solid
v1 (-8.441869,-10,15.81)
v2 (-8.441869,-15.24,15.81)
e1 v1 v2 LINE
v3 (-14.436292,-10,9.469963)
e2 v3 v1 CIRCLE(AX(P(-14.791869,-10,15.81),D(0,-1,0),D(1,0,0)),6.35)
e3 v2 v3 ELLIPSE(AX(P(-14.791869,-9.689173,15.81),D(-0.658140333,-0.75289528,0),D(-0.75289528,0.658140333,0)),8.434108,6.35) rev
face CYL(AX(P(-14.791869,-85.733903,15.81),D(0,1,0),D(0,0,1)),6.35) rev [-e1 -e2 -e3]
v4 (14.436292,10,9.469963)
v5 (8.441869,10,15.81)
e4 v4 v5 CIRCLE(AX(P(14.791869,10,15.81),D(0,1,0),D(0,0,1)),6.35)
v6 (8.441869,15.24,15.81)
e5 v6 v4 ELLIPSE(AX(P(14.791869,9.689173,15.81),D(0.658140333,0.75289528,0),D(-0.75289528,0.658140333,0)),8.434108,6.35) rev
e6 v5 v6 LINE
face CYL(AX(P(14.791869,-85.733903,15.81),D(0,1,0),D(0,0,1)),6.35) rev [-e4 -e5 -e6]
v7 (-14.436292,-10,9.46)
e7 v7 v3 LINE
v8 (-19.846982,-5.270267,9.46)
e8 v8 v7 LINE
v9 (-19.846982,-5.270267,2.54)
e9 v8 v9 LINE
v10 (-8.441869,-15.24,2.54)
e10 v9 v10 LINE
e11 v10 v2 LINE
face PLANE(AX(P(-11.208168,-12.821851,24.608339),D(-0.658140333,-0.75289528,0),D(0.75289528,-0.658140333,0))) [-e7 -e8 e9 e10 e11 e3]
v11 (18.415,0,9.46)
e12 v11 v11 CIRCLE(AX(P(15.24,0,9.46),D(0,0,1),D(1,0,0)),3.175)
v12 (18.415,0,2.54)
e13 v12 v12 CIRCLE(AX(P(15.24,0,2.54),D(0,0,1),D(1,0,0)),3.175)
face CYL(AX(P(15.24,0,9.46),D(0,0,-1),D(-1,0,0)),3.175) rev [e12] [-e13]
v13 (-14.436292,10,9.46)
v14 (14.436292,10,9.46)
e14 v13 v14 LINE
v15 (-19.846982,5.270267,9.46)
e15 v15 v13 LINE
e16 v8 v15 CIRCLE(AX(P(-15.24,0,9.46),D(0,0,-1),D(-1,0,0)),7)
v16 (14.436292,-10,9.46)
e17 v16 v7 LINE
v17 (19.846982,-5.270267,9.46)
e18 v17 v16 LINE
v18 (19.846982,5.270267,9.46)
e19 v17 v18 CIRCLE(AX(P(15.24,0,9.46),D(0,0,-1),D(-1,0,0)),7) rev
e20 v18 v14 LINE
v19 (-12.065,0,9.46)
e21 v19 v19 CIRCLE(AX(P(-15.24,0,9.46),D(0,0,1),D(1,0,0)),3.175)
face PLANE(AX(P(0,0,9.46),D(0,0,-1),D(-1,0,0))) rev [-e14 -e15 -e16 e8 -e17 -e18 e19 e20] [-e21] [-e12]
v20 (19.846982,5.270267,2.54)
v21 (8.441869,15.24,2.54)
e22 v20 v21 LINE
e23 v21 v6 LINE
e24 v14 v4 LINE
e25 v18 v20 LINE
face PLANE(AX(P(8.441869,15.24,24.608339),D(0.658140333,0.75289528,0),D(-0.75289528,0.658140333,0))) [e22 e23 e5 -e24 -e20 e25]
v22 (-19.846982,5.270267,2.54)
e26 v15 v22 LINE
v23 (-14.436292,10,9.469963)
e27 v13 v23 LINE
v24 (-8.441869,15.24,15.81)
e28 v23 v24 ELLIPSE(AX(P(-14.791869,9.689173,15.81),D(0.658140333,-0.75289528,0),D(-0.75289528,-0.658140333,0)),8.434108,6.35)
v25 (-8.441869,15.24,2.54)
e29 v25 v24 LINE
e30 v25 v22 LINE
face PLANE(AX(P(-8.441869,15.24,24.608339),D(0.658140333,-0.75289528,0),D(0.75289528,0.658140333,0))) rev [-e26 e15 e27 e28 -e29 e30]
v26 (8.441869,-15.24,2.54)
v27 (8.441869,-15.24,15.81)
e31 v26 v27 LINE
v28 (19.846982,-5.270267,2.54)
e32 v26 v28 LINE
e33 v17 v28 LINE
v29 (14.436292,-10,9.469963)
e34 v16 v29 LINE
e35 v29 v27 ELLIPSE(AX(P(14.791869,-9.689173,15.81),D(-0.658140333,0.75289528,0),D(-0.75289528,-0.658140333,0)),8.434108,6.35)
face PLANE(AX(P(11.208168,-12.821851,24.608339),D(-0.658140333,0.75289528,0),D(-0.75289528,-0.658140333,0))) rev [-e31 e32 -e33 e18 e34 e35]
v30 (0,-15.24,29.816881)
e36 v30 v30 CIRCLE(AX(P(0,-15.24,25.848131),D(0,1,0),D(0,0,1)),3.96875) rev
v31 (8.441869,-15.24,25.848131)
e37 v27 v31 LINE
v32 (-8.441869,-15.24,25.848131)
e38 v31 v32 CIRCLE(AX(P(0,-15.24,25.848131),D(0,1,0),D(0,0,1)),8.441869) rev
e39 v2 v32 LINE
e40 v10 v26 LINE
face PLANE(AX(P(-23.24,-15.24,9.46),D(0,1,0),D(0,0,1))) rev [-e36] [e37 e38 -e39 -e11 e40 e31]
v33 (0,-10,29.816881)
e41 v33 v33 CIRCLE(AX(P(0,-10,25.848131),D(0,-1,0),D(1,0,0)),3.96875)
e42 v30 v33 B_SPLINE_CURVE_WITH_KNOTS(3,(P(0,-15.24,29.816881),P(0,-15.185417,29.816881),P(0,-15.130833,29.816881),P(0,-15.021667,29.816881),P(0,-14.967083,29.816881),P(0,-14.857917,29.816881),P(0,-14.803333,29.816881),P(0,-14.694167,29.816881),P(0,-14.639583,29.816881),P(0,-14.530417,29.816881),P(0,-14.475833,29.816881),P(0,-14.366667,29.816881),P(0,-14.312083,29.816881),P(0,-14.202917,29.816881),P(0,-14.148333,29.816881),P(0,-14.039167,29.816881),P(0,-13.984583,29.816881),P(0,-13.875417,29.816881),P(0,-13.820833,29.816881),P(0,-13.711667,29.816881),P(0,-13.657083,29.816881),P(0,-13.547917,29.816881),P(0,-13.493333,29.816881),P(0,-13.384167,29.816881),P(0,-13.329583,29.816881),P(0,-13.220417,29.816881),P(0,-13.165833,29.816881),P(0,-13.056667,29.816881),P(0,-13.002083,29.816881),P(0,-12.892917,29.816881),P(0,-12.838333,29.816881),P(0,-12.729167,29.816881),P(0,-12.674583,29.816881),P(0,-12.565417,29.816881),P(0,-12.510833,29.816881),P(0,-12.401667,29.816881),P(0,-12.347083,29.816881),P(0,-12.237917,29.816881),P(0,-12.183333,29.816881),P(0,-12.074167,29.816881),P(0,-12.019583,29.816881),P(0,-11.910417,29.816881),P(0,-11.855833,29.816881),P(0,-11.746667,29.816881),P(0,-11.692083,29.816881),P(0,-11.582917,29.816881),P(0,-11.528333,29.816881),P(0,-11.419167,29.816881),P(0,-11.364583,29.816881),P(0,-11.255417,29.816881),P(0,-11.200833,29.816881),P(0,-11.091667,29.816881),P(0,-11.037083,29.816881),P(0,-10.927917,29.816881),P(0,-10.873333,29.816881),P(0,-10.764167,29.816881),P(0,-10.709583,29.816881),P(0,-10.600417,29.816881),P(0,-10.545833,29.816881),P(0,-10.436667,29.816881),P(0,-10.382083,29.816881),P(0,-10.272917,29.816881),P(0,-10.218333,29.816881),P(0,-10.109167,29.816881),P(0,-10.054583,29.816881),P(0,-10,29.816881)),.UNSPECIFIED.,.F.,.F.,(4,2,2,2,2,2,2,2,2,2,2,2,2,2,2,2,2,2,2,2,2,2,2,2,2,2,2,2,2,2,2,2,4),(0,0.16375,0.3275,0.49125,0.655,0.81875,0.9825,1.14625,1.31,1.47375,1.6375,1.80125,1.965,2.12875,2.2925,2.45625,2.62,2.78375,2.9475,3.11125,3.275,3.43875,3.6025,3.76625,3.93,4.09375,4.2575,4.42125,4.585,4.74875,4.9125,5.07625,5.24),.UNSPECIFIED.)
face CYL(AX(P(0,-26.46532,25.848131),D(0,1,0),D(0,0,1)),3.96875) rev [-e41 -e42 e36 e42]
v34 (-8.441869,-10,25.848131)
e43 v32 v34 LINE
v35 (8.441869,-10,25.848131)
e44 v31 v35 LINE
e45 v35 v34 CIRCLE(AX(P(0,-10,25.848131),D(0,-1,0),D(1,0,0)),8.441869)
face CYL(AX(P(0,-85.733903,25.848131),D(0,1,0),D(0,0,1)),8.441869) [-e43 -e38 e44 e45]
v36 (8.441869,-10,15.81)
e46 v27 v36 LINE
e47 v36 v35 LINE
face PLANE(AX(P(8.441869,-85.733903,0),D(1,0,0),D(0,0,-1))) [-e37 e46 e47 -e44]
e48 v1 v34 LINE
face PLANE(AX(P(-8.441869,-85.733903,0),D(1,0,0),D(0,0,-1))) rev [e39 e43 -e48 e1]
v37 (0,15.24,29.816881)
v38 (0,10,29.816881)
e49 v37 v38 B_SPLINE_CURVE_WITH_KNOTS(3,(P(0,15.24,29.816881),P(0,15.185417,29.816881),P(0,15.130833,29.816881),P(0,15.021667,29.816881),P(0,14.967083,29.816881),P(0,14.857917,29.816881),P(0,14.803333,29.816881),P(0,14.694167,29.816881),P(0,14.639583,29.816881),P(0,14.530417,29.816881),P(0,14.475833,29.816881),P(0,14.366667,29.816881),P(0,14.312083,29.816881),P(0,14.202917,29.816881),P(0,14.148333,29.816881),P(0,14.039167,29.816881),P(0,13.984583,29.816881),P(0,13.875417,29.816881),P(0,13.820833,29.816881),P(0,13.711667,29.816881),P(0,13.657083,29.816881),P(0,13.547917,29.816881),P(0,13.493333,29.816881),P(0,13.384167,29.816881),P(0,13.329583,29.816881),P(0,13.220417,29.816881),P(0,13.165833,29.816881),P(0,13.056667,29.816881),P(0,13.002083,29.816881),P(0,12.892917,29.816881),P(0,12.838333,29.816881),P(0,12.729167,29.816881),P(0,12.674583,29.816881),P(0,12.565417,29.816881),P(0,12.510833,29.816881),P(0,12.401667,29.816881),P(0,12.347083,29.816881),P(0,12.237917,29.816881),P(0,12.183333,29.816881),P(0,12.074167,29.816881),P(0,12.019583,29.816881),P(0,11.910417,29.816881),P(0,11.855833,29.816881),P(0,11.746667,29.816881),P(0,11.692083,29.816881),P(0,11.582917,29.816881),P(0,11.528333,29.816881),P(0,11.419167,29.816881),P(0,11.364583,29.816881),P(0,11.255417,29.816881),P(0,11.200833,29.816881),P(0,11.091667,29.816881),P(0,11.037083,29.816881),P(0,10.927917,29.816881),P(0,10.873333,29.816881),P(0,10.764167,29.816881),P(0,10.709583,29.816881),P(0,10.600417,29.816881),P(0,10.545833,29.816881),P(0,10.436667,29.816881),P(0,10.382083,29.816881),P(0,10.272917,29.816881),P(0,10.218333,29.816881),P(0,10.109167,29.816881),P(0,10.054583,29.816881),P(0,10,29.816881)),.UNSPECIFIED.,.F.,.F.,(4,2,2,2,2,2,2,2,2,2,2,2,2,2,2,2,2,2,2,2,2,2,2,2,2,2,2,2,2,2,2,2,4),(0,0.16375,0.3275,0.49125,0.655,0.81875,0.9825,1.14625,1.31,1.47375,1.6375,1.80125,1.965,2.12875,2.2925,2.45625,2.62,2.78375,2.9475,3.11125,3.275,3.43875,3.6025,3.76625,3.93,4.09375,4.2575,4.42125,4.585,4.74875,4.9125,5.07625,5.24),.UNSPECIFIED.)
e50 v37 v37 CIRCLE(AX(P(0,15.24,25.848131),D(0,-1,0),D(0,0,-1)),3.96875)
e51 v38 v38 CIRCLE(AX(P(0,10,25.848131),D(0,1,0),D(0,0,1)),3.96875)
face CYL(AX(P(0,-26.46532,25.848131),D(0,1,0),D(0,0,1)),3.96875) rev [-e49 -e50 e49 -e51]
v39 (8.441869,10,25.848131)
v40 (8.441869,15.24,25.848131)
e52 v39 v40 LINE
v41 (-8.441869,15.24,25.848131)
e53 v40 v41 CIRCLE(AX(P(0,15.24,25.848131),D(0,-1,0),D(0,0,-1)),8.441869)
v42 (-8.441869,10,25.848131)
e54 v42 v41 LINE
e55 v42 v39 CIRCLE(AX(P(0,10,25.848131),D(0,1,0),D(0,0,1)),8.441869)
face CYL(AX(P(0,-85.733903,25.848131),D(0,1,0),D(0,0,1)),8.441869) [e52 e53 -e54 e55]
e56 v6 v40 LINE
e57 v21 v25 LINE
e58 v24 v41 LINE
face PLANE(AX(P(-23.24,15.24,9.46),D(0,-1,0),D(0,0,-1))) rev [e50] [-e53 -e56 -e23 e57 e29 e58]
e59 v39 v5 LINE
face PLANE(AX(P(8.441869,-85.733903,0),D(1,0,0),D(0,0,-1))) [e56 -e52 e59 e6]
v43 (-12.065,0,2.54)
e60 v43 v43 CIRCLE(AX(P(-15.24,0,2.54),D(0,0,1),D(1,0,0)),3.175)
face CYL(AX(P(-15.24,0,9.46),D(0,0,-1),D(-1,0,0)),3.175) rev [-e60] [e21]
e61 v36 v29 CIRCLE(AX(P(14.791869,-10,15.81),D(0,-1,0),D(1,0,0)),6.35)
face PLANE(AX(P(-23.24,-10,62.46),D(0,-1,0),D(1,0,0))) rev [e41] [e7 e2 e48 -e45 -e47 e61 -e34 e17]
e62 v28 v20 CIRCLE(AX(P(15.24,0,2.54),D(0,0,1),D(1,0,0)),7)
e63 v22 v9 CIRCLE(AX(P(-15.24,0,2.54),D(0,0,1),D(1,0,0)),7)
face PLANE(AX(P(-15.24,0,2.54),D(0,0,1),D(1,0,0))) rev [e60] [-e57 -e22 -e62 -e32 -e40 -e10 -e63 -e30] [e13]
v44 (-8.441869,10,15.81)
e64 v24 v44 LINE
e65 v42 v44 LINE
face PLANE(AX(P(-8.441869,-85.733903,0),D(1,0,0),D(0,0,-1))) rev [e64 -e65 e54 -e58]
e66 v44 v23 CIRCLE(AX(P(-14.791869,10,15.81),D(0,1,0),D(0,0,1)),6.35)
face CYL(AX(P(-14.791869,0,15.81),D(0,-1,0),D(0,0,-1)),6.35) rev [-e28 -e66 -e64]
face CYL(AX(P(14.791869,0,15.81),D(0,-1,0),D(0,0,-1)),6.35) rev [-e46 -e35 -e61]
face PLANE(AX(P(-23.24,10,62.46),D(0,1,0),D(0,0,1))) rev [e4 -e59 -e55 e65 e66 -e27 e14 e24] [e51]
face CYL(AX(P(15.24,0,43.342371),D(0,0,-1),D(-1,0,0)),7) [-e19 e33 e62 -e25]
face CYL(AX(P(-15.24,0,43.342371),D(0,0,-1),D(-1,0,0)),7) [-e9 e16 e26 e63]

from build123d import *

# Parameters (mm, degrees)
SKETCH1_W                      = 46.48
SKETCH1_H                      = 30.48
SKETCH1_R                      = 3.175
BOSS_EXTRUDE1_DEPTH            = 9.46
SKETCH2_W                      = 46.48
SKETCH2_H                      = 5.24
BOSS_EXTRUDE2_DEPTH            = 53
CUT_EXTRUDE1_REACH             = 70.364
SKETCH4_R                      = 3.96875
CUT_EXTRUDE1_DIRECTION_2_REACH = 70.364
CUT_EXTRUDE3_REACH             = 70.364
CUT_EXTRUDE3_DIRECTION_2_REACH = 70.364
CUT_EXTRUDE4_DEPTH             = 9.46
BOSS_EXTRUDE3_DEPTH            = 9.46
FILLET3_R                      = 6.35
CUT_EXTRUDE5_DEPTH             = 2.54


with BuildPart() as part:
    # Sketch1 → Boss-Extrude1 (new body)
    with BuildSketch(Plane.XY):
        Rectangle(SKETCH1_W, SKETCH1_H)
        with Locations((15.24, 0)):
            Circle(SKETCH1_R, mode=Mode.SUBTRACT)
        with Locations((-15.24, 0)):
            Circle(SKETCH1_R, mode=Mode.SUBTRACT)
    extrude(amount=BOSS_EXTRUDE1_DEPTH)

    # Sketch2 → Boss-Extrude2 (add)
    with BuildSketch(Plane.XY.offset(9.46)):
        with Locations((0, 12.62)):
            Rectangle(SKETCH2_W, SKETCH2_H)
        with Locations((0, -12.62)):
            Rectangle(SKETCH2_W, SKETCH2_H)
    extrude(amount=BOSS_EXTRUDE2_DEPTH)

    # Cut-Extrude1: up to this face of the body (flat: up to its plane)
    cut_extrude1_end = Plane(part.part.faces().sort_by_distance((0, -15.24, 31.23))[0])
    # Sketch4 → Cut-Extrude1 (cut, up to the picked face)
    with BuildSketch(Plane(origin=(0, 0, 0), x_dir=(1, 0, 0), z_dir=(0, 1, 0)), mode=Mode.PRIVATE) as cut_extrude1_sk1:
        with Locations(Location((0, -25.8481308, 0), (0, 0, 270))):
            Circle(SKETCH4_R)
    cut_extrude1_tool1 = split(extrude(cut_extrude1_sk1.sketch, amount=-CUT_EXTRUDE1_REACH, mode=Mode.PRIVATE), bisect_by=cut_extrude1_end, keep=Keep.BOTH, mode=Mode.PRIVATE)
    add(cut_extrude1_tool1.solids().sort_by(Axis((0, 0, 25.848131), (0, -1, 0)))[0], mode=Mode.SUBTRACT)

    # Cut-Extrude1 direction 2: up to this face of the body (flat: up to its plane)
    cut_extrude1_direction_2_end = Plane(part.part.faces().sort_by_distance((0, 15.24, 31.23))[0])
    # Sketch4 → Cut-Extrude1 direction 2 (cut, up to the picked face)
    with BuildSketch(Plane(origin=(0, 0, 0), x_dir=(1, 0, 0), z_dir=(0, 1, 0)), mode=Mode.PRIVATE) as cut_extrude1_direction_2_sk1:
        with Locations(Location((0, -25.8481308, 0), (0, 0, 270))):
            Circle(SKETCH4_R)
    cut_extrude1_direction_2_tool1 = split(extrude(cut_extrude1_direction_2_sk1.sketch, amount=CUT_EXTRUDE1_DIRECTION_2_REACH, mode=Mode.PRIVATE), bisect_by=cut_extrude1_direction_2_end, keep=Keep.BOTH, mode=Mode.PRIVATE)
    add(cut_extrude1_direction_2_tool1.solids().sort_by(Axis((0, 0, 25.848131), (0, 1, 0)))[0], mode=Mode.SUBTRACT)

    # Cut-Extrude3: up to this face of the body (flat: up to its plane)
    cut_extrude3_end = Plane(part.part.faces().sort_by_distance((0, -15.24, 31.323322986))[0])
    # Sketch6 → Cut-Extrude3 (cut, up to the picked face)
    with BuildSketch(Plane(origin=(0, 0, 0), x_dir=(1, 0, 0), z_dir=(0, 1, 0)), mode=Mode.PRIVATE) as cut_extrude3_sk1:
        with BuildLine():
            Line((-8.4418692, -25.8481308), (-8.4418692, -17.46))
            Line((-8.4418692, -17.46), (-8.4418692, -9.46))
            Line((-8.4418692, -9.46), (-16.4418692, -9.46))
            Line((-16.4418692, -9.46), (-23.24, -9.46))
            Line((-23.24, -9.46), (-23.24, -62.46))
            Line((-23.24, -62.46), (23.24, -62.46))
            Line((23.24, -62.46), (23.24, -9.46))
            Line((23.24, -9.46), (16.4418692, -9.46))
            Line((16.4418692, -9.46), (8.4418692, -9.46))
            Line((8.4418692, -9.46), (8.4418692, -17.46))
            Line((8.4418692, -17.46), (8.4418692, -25.8481308))
            ThreePointArc((8.4418692, -25.8481308), (0, -34.29), (-8.4418692, -25.8481308))
        make_face()
    cut_extrude3_tool1 = split(extrude(cut_extrude3_sk1.sketch, amount=-CUT_EXTRUDE3_REACH, mode=Mode.PRIVATE), bisect_by=cut_extrude3_end, keep=Keep.BOTH, mode=Mode.PRIVATE)
    add(cut_extrude3_tool1.solids().sort_by(Axis((0, 0, 38.753518), (0, -1, 0)))[0], mode=Mode.SUBTRACT)

    # Cut-Extrude3 direction 2: up to this face of the body (flat: up to its plane)
    cut_extrude3_direction_2_end = Plane(part.part.faces().sort_by_distance((0, 15.24, 31.323322986))[0])
    # Sketch6 → Cut-Extrude3 direction 2 (cut, up to the picked face)
    with BuildSketch(Plane(origin=(0, 0, 0), x_dir=(1, 0, 0), z_dir=(0, 1, 0)), mode=Mode.PRIVATE) as cut_extrude3_direction_2_sk1:
        with BuildLine():
            Line((-8.4418692, -25.8481308), (-8.4418692, -17.46))
            Line((-8.4418692, -17.46), (-8.4418692, -9.46))
            Line((-8.4418692, -9.46), (-16.4418692, -9.46))
            Line((-16.4418692, -9.46), (-23.24, -9.46))
            Line((-23.24, -9.46), (-23.24, -62.46))
            Line((-23.24, -62.46), (23.24, -62.46))
            Line((23.24, -62.46), (23.24, -9.46))
            Line((23.24, -9.46), (16.4418692, -9.46))
            Line((16.4418692, -9.46), (8.4418692, -9.46))
            Line((8.4418692, -9.46), (8.4418692, -17.46))
            Line((8.4418692, -17.46), (8.4418692, -25.8481308))
            ThreePointArc((8.4418692, -25.8481308), (0, -34.29), (-8.4418692, -25.8481308))
        make_face()
    cut_extrude3_direction_2_tool1 = split(extrude(cut_extrude3_direction_2_sk1.sketch, amount=CUT_EXTRUDE3_DIRECTION_2_REACH, mode=Mode.PRIVATE), bisect_by=cut_extrude3_direction_2_end, keep=Keep.BOTH, mode=Mode.PRIVATE)
    add(cut_extrude3_direction_2_tool1.solids().sort_by(Axis((0, 0, 38.753518), (0, 1, 0)))[0], mode=Mode.SUBTRACT)

    # Sketch7 → Cut-Extrude4 (cut)
    with BuildSketch(Plane.XY):
        with BuildLine():
            ThreePointArc((-15.24, -7), (-22.24, 0), (-15.24, 7))
            Line((-15.24, 7), (-8.4418692, 7))
            Line((-8.4418692, 7), (-8.4418692, 15.24))
            Line((-8.4418692, 15.24), (-23.24, 15.24))
            Line((-23.24, 15.24), (-23.24, -15.24))
            Line((-23.24, -15.24), (-8.4418692, -15.24))
            Line((-8.4418692, -15.24), (-8.4418692, -7))
            Line((-8.4418692, -7), (-15.24, -7))
        make_face()
        with BuildLine():
            Line((8.4418692, 15.24), (8.4418692, 7))
            Line((8.4418692, 7), (15.24, 7))
            ThreePointArc((15.24, 7), (22.24, 0), (15.24, -7))
            Line((15.24, -7), (8.4418692, -7))
            Line((8.4418692, -7), (8.4418692, -15.24))
            Line((8.4418692, -15.24), (23.24, -15.24))
            Line((23.24, -15.24), (23.24, 15.24))
            Line((23.24, 15.24), (8.4418692, 15.24))
        make_face()
    extrude(amount=CUT_EXTRUDE4_DEPTH, mode=Mode.SUBTRACT)

    # Sketch8 → Boss-Extrude3 (add)
    with BuildSketch(Plane.XY):
        with BuildLine():
            Line((8.4418692, -15.24), (19.846982329, -5.27026696))
            ThreePointArc((19.846982329, -5.27026696), (17.700501096, -6.553314761), (15.24, -7))
            Line((15.24, -7), (8.4418692, -7))
            Line((8.4418692, -7), (8.4418692, -15.24))
        make_face()
        with BuildLine():
            ThreePointArc((-19.846982329, -5.27026696), (-17.700501096, -6.553314761), (-15.24, -7))
            Line((-15.24, -7), (-8.4418692, -7))
            Line((-8.4418692, -7), (-8.4418692, -15.24))
            Line((-8.4418692, -15.24), (-19.846982329, -5.27026696))
        make_face()
        with BuildLine():
            Line((8.4418692, 15.24), (19.846982329, 5.27026696))
            ThreePointArc((19.846982329, 5.27026696), (17.700501096, 6.553314761), (15.24, 7))
            Line((15.24, 7), (8.4418692, 7))
            Line((8.4418692, 7), (8.4418692, 15.24))
        make_face()
        with BuildLine():
            Line((-8.4418692, 15.24), (-19.846982329, 5.27026696))
            ThreePointArc((-19.846982329, 5.27026696), (-17.700501096, 6.553314761), (-15.24, 7))
            Line((-15.24, 7), (-8.4418692, 7))
            Line((-8.4418692, 7), (-8.4418692, 15.24))
        make_face()
    extrude(amount=BOSS_EXTRUDE3_DEPTH)

    # Fillet3
    # the kernel refuses this fillet: 6.35 mm, written as the material it adds along each edge
    with BuildSketch(Plane(origin=(8.4418692, -10, 9.46), x_dir=(0, 0, 1), z_dir=(0, -1, 0))) as fillet3_piece_1_section:
        with BuildLine():
            CenterArc((FILLET3_R, -FILLET3_R), FILLET3_R, 90, 90)
            Line((0, -FILLET3_R), (0, 0))
            Line((0, 0), (FILLET3_R, 0))
        make_face()
    fillet3_piece_1 = extrude(amount=5.24, mode=Mode.PRIVATE)
    fillet3_piece_1 = split(fillet3_piece_1, bisect_by=Plane(origin=(10.547300474, -13.399545855, 11.138669317), z_dir=(-0.6581403326503757, 0.7528952799286586, 0)), keep=Keep.TOP, mode=Mode.PRIVATE)
    add(fillet3_piece_1)
    with BuildSketch(Plane(origin=(-8.4418692, -10, 9.46), x_dir=(0, 0, 1), z_dir=(0, -1, 0))) as fillet3_piece_2_section:
        with BuildLine():
            CenterArc((FILLET3_R, FILLET3_R), FILLET3_R, 180, 90)
            Line((0, FILLET3_R), (0, 0))
            Line((0, 0), (FILLET3_R, 0))
        make_face()
    fillet3_piece_2 = extrude(amount=5.24, mode=Mode.PRIVATE)
    fillet3_piece_2 = split(fillet3_piece_2, bisect_by=Plane(origin=(-10.547300474, -13.399545855, 11.138669317), z_dir=(0.6581403326503753, 0.7528952799286588, 0)), keep=Keep.TOP, mode=Mode.PRIVATE)
    add(fillet3_piece_2)
    with BuildSketch(Plane(origin=(8.4418692, 10, 9.46), x_dir=(1, 0, 0), z_dir=(0, 1, 0))) as fillet3_piece_3_section:
        with BuildLine():
            CenterArc((FILLET3_R, -FILLET3_R), FILLET3_R, 90, 90)
            Line((0, -FILLET3_R), (0, 0))
            Line((0, 0), (FILLET3_R, 0))
        make_face()
    fillet3_piece_3 = extrude(amount=5.24, mode=Mode.PRIVATE)
    fillet3_piece_3 = split(fillet3_piece_3, bisect_by=Plane(origin=(10.547300473, 13.399545855, 11.138669317), z_dir=(-0.6581403326503754, -0.7528952799286586, 0)), keep=Keep.TOP, mode=Mode.PRIVATE)
    add(fillet3_piece_3)
    with BuildSketch(Plane(origin=(-8.4418692, 10, 9.46), x_dir=(-1, 0, 0), z_dir=(0, 1, 0))) as fillet3_piece_4_section:
        with BuildLine():
            CenterArc((FILLET3_R, FILLET3_R), FILLET3_R, 180, 90)
            Line((0, FILLET3_R), (0, 0))
            Line((0, 0), (FILLET3_R, 0))
        make_face()
    fillet3_piece_4 = extrude(amount=5.24, mode=Mode.PRIVATE)
    fillet3_piece_4 = split(fillet3_piece_4, bisect_by=Plane(origin=(-10.547300473, 13.399545855, 11.138669317), z_dir=(0.6581403326503757, -0.7528952799286586, 0)), keep=Keep.TOP, mode=Mode.PRIVATE)
    add(fillet3_piece_4)

    # Sketch10 → Cut-Extrude5 (cut)
    with BuildSketch(Plane.XY):
        with BuildLine():
            Line((-8.4418692, 15.24), (-19.846982329, 5.27026696))
            ThreePointArc((-19.846982329, 5.27026696), (-22.24, 0), (-19.846982329, -5.27026696))
            Line((-19.846982329, -5.27026696), (-8.4418692, -15.24))
            Line((-8.4418692, -15.24), (8.4418692, -15.24))
            Line((8.4418692, -15.24), (19.846982329, -5.27026696))
            ThreePointArc((19.846982329, -5.27026696), (22.24, 0), (19.846982329, 5.27026696))
            Line((19.846982329, 5.27026696), (8.4418692, 15.24))
            Line((8.4418692, 15.24), (-8.4418692, 15.24))
        make_face()
    extrude(amount=CUT_EXTRUDE5_DEPTH, mode=Mode.SUBTRACT)


solid = part.part
